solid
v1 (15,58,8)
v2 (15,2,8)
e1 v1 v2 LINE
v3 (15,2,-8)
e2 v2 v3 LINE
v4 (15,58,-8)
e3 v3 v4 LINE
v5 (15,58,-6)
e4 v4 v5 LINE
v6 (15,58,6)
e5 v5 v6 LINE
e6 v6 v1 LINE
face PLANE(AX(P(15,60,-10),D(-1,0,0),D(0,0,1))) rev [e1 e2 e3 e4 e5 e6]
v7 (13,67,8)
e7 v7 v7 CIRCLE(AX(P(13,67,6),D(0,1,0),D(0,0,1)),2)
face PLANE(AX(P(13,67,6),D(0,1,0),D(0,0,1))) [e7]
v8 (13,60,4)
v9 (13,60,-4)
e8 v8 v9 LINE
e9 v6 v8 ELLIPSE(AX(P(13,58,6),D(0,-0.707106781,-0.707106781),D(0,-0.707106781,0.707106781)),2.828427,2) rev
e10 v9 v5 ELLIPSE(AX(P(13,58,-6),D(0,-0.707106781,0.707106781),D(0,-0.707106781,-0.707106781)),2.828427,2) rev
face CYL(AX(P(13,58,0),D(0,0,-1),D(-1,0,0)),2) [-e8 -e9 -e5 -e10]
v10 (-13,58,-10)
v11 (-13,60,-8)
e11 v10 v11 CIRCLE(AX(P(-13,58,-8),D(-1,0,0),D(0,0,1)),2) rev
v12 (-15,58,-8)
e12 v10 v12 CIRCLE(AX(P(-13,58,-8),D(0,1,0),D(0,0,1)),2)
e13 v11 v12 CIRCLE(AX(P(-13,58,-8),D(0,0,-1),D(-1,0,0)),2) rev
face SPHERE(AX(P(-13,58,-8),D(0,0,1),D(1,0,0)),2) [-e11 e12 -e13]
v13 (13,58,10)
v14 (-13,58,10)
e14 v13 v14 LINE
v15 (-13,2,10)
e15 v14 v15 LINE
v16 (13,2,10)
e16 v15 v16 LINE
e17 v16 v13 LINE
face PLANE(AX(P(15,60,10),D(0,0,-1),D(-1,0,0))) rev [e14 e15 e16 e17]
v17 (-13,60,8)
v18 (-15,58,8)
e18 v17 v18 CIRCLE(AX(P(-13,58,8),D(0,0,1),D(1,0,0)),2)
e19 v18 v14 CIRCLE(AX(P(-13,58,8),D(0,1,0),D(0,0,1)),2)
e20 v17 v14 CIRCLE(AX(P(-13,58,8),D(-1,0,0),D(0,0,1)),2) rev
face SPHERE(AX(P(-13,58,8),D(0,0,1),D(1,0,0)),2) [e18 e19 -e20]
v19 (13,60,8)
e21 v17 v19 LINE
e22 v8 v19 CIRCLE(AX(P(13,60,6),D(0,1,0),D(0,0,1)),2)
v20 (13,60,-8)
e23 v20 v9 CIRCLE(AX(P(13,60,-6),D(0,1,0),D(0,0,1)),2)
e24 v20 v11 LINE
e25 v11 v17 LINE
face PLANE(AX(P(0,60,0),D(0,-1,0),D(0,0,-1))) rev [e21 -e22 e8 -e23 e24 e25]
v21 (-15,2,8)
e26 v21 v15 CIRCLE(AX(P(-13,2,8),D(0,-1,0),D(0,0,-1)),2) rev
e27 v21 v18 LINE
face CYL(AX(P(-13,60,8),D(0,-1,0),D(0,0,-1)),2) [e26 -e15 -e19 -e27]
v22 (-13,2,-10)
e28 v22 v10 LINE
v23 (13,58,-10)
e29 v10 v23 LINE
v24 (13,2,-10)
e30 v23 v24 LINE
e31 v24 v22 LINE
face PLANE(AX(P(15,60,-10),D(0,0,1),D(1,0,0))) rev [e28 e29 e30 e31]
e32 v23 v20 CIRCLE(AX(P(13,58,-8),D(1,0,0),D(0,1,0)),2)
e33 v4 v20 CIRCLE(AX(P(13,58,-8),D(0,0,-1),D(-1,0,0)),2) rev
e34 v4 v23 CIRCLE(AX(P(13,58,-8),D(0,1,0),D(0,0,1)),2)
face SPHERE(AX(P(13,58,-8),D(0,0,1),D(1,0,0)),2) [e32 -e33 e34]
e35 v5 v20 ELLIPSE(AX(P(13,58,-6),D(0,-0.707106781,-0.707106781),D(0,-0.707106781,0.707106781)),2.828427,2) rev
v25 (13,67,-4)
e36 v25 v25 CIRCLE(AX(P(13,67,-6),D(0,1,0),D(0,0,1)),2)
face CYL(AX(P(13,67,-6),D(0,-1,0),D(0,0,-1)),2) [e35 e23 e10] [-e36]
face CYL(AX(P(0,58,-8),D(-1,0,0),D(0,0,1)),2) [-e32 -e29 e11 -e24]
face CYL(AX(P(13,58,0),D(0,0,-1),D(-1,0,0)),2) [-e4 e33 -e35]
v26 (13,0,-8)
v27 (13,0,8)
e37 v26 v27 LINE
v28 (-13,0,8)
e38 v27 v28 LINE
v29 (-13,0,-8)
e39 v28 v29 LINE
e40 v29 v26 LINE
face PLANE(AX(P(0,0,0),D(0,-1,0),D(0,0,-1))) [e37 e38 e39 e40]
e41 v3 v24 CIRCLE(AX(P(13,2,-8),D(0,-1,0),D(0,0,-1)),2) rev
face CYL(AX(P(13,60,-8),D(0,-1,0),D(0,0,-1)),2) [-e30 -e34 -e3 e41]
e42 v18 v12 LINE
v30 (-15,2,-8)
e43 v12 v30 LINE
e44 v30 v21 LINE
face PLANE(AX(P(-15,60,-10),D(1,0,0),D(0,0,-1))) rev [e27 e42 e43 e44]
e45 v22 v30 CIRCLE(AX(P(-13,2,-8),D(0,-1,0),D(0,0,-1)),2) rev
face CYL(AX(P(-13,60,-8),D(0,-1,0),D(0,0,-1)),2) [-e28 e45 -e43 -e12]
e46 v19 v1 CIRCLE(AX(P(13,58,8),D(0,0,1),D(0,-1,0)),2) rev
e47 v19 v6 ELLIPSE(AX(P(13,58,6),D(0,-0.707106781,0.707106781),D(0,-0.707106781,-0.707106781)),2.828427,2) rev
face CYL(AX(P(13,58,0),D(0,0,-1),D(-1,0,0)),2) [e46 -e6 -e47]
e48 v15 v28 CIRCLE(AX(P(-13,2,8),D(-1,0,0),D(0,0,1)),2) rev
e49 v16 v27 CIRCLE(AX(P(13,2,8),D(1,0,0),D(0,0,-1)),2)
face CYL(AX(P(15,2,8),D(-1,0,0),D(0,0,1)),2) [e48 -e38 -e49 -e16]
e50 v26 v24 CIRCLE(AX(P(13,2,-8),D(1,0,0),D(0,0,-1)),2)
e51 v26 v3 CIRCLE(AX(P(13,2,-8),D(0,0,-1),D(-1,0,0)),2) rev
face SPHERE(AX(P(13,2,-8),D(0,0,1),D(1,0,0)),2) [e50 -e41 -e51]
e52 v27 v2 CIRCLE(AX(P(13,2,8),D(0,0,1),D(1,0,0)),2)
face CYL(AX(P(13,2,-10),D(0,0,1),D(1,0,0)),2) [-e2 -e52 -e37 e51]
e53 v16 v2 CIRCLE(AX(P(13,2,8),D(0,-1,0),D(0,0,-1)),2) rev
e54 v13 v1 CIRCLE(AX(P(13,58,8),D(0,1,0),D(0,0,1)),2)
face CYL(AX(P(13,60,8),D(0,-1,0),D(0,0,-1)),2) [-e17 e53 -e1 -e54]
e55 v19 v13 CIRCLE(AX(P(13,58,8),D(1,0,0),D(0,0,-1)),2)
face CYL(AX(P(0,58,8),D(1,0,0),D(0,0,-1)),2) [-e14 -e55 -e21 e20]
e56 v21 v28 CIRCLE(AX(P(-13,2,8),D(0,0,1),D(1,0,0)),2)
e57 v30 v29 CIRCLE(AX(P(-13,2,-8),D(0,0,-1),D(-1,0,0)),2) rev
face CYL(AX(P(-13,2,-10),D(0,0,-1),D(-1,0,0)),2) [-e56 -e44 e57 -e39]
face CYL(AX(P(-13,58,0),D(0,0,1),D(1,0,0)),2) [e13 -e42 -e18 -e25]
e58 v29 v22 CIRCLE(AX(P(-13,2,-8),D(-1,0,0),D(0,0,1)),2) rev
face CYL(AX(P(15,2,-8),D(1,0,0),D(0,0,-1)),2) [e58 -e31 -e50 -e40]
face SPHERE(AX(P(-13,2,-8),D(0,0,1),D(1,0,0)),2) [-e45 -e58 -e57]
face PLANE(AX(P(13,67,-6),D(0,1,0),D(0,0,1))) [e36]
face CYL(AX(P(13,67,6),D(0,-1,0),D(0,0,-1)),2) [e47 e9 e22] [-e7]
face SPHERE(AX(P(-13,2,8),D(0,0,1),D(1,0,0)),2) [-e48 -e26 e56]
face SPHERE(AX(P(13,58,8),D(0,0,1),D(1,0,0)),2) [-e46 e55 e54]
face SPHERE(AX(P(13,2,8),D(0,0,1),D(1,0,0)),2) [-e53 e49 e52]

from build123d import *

# Parameters (mm, degrees)
SKETCH1_W           = 30
SKETCH1_H           = 20
BOSS_EXTRUDE1_DEPTH = 60
SKETCH2_R           = 2
BOSS_EXTRUDE2_DEPTH = 7
FILLET1_R           = 2


with BuildPart() as part:
    # Sketch1 → Boss-Extrude1 (new body)
    with BuildSketch(Plane(origin=(0, 0, 0), x_dir=(1, 0, 0), z_dir=(0, 1, 0))):
        Rectangle(SKETCH1_W, SKETCH1_H)
    extrude(amount=BOSS_EXTRUDE1_DEPTH)

    # Sketch2 → Boss-Extrude2 (add)
    with BuildSketch(Plane(origin=(0, 60, 0), x_dir=(1, 0, 0), z_dir=(0, 1, 0))):
        with Locations((13, 6)):
            Circle(SKETCH2_R)
        with Locations((13, -6)):
            Circle(SKETCH2_R)
    extrude(amount=BOSS_EXTRUDE2_DEPTH)

    # Fillet1
    # the kernel refuses this fillet: 2 mm, written as the material it takes off along each edge
    with BuildSketch(Plane(origin=(13, 58, 8), x_dir=(0, 1, 0), z_dir=(1, 0, 0))) as fillet1_piece_1_section:
        Polygon((0, 0), (FILLET1_R * 1.02, 0), (FILLET1_R * 1.02, FILLET1_R * 1.02), (0, FILLET1_R * 1.02), align=None)
    fillet1_piece_1 = extrude(amount=FILLET1_R * 1.02, mode=Mode.PRIVATE)
    fillet1_piece_1 = fillet1_piece_1 - Plane(origin=(13, 58, 8), x_dir=(0, -0.7071067811865475, -0.7071067811865475), z_dir=(1, 0, 0)) * Sphere(FILLET1_R, mode=Mode.PRIVATE)
    add(fillet1_piece_1, mode=Mode.SUBTRACT)
    with BuildSketch(Plane(origin=(13, 58, -8), x_dir=(1, 0, 0), z_dir=(0, 0, -1))) as fillet1_piece_2_section:
        Polygon((0, 0), (FILLET1_R * 1.02, 0), (FILLET1_R * 1.02, -FILLET1_R * 1.02), (0, -FILLET1_R * 1.02), align=None)
    fillet1_piece_2 = extrude(amount=FILLET1_R * 1.02, mode=Mode.PRIVATE)
    fillet1_piece_2 = fillet1_piece_2 - Plane(origin=(13, 58, -8), x_dir=(-0.7071067811865475, -0.7071067811865475, 0), z_dir=(0, 0, -1)) * Sphere(FILLET1_R, mode=Mode.PRIVATE)
    add(fillet1_piece_2, mode=Mode.SUBTRACT)
    with BuildSketch(Plane(origin=(-13, 58, -8), x_dir=(-1, 0, 0), z_dir=(0, 0, -1))) as fillet1_piece_3_section:
        Polygon((0, 0), (FILLET1_R * 1.02, 0), (FILLET1_R * 1.02, FILLET1_R * 1.02), (0, FILLET1_R * 1.02), align=None)
    fillet1_piece_3 = extrude(amount=FILLET1_R * 1.02, mode=Mode.PRIVATE)
    fillet1_piece_3 = fillet1_piece_3 - Plane(origin=(-13, 58, -8), x_dir=(0.7071067811865475, -0.7071067811865475, 0), z_dir=(0, 0, -1)) * Sphere(FILLET1_R, mode=Mode.PRIVATE)
    add(fillet1_piece_3, mode=Mode.SUBTRACT)
    with BuildSketch(Plane(origin=(-13, 58, 8), x_dir=(0, 1, 0), z_dir=(-1, 0, 0))) as fillet1_piece_4_section:
        Polygon((0, 0), (FILLET1_R * 1.02, 0), (FILLET1_R * 1.02, -FILLET1_R * 1.02), (0, -FILLET1_R * 1.02), align=None)
    fillet1_piece_4 = extrude(amount=FILLET1_R * 1.02, mode=Mode.PRIVATE)
    fillet1_piece_4 = fillet1_piece_4 - Plane(origin=(-13, 58, 8), x_dir=(0, -0.7071067811865475, -0.7071067811865475), z_dir=(-1, 0, 0)) * Sphere(FILLET1_R, mode=Mode.PRIVATE)
    add(fillet1_piece_4, mode=Mode.SUBTRACT)
    with BuildSketch(Plane(origin=(13, 2, -8), x_dir=(1, 0, 0), z_dir=(0, 0, -1))) as fillet1_piece_5_section:
        Polygon((0, 0), (FILLET1_R * 1.02, 0), (FILLET1_R * 1.02, FILLET1_R * 1.02), (0, FILLET1_R * 1.02), align=None)
    fillet1_piece_5 = extrude(amount=FILLET1_R * 1.02, mode=Mode.PRIVATE)
    fillet1_piece_5 = fillet1_piece_5 - Plane(origin=(13, 2, -8), x_dir=(-0.7071067811865475, 0.7071067811865475, 0), z_dir=(0, 0, -1)) * Sphere(FILLET1_R, mode=Mode.PRIVATE)
    add(fillet1_piece_5, mode=Mode.SUBTRACT)
    with BuildSketch(Plane(origin=(-13, 2, -8), x_dir=(-1, 0, 0), z_dir=(0, 0, -1))) as fillet1_piece_6_section:
        Polygon((0, 0), (FILLET1_R * 1.02, 0), (FILLET1_R * 1.02, -FILLET1_R * 1.02), (0, -FILLET1_R * 1.02), align=None)
    fillet1_piece_6 = extrude(amount=FILLET1_R * 1.02, mode=Mode.PRIVATE)
    fillet1_piece_6 = fillet1_piece_6 - Plane(origin=(-13, 2, -8), x_dir=(0.7071067811865475, 0.7071067811865475, 0), z_dir=(0, 0, -1)) * Sphere(FILLET1_R, mode=Mode.PRIVATE)
    add(fillet1_piece_6, mode=Mode.SUBTRACT)
    with BuildSketch(Plane(origin=(13, 2, 8), x_dir=(0, -1, 0), z_dir=(1, 0, 0))) as fillet1_piece_7_section:
        Polygon((0, 0), (FILLET1_R * 1.02, 0), (FILLET1_R * 1.02, -FILLET1_R * 1.02), (0, -FILLET1_R * 1.02), align=None)
    fillet1_piece_7 = extrude(amount=FILLET1_R * 1.02, mode=Mode.PRIVATE)
    fillet1_piece_7 = fillet1_piece_7 - Plane(origin=(13, 2, 8), x_dir=(0, 0.7071067811865475, -0.7071067811865475), z_dir=(1, 0, 0)) * Sphere(FILLET1_R, mode=Mode.PRIVATE)
    add(fillet1_piece_7, mode=Mode.SUBTRACT)
    with BuildSketch(Plane(origin=(-13, 2, 8), x_dir=(0, -1, 0), z_dir=(-1, 0, 0))) as fillet1_piece_8_section:
        Polygon((0, 0), (FILLET1_R * 1.02, 0), (FILLET1_R * 1.02, FILLET1_R * 1.02), (0, FILLET1_R * 1.02), align=None)
    fillet1_piece_8 = extrude(amount=FILLET1_R * 1.02, mode=Mode.PRIVATE)
    fillet1_piece_8 = fillet1_piece_8 - Plane(origin=(-13, 2, 8), x_dir=(0, 0.7071067811865475, -0.7071067811865475), z_dir=(-1, 0, 0)) * Sphere(FILLET1_R, mode=Mode.PRIVATE)
    add(fillet1_piece_8, mode=Mode.SUBTRACT)
    with BuildSketch(Plane(origin=(15, 60, 8), x_dir=(0, -1, 0), z_dir=(0, 0, -1))) as fillet1_piece_9_section:
        with BuildLine():
            CenterArc((FILLET1_R, FILLET1_R), FILLET1_R, 180, 90)
            Line((0, FILLET1_R), (0, 0))
            Line((0, 0), (FILLET1_R, 0))
        make_face()
    fillet1_piece_9 = extrude(amount=2, mode=Mode.PRIVATE)
    fillet1_piece_9 = fillet1_piece_9 - Plane(origin=(13, 59.42884434, 6), x_dir=(1, 0, 0), z_dir=(0, -1, 0)) * Cylinder(2, 12, mode=Mode.PRIVATE)
    add(fillet1_piece_9, mode=Mode.SUBTRACT)
    with BuildSketch(Plane(origin=(15, 60, -6), x_dir=(0, -1, 0), z_dir=(0, 0, -1))) as fillet1_piece_10_section:
        with BuildLine():
            CenterArc((FILLET1_R, FILLET1_R), FILLET1_R, 180, 90)
            Line((0, FILLET1_R), (0, 0))
            Line((0, 0), (FILLET1_R, 0))
        make_face()
    fillet1_piece_10 = extrude(amount=2, mode=Mode.PRIVATE)
    fillet1_piece_10 = fillet1_piece_10 - Plane(origin=(13, 59.42884434, -6), x_dir=(1, 0, 0), z_dir=(0, -1, 0)) * Cylinder(2, 13, mode=Mode.PRIVATE)
    add(fillet1_piece_10, mode=Mode.SUBTRACT)
    with BuildSketch(Plane(origin=(13, 60, -10), x_dir=(0, -1, 0), z_dir=(-1, 0, 0)), Plane(origin=(-13, 0, 10), x_dir=(0, 0, -1), z_dir=(1, 0, 0))) as fillet1_piece_11:
        with BuildLine():
            CenterArc((FILLET1_R, FILLET1_R), FILLET1_R, 180, 90)
            Line((0, FILLET1_R), (0, 0))
            Line((0, 0), (FILLET1_R, 0))
        make_face()
    extrude(amount=26, mode=Mode.SUBTRACT)
    with BuildSketch(Plane(origin=(15, 60, 6), x_dir=(0, -1, 0), z_dir=(0, 0, -1))) as fillet1_piece_12_section:
        with BuildLine():
            CenterArc((FILLET1_R, FILLET1_R), FILLET1_R, 180, 90)
            Line((0, FILLET1_R), (0, 0))
            Line((0, 0), (FILLET1_R, 0))
        make_face()
    fillet1_piece_12 = extrude(amount=12, mode=Mode.PRIVATE)
    fillet1_piece_12 = fillet1_piece_12 - Plane(origin=(13, 59.530547013, 6), x_dir=(1, 0, 0), z_dir=(0, -1, 0)) * Cylinder(2, 32, mode=Mode.PRIVATE)
    fillet1_piece_12 = fillet1_piece_12 - Plane(origin=(13, 59.530547013, -6), x_dir=(1, 0, 0), z_dir=(0, -1, 0)) * Cylinder(2, 32, mode=Mode.PRIVATE)
    add(fillet1_piece_12, mode=Mode.SUBTRACT)
    with BuildSketch(Plane(origin=(-15, 60, -8), x_dir=(0, -1, 0), z_dir=(0, 0, 1))) as fillet1_piece_13:
        with BuildLine():
            CenterArc((FILLET1_R, FILLET1_R), FILLET1_R, 180, 90)
            Line((0, FILLET1_R), (0, 0))
            Line((0, 0), (FILLET1_R, 0))
        make_face()
    extrude(amount=16, mode=Mode.SUBTRACT)
    with BuildSketch(Plane(origin=(13, 0, -10), x_dir=(0, 1, 0), z_dir=(-1, 0, 0)), Plane(origin=(-13, 60, 10), x_dir=(0, 0, -1), z_dir=(1, 0, 0))) as fillet1_piece_14:
        with BuildLine():
            CenterArc((FILLET1_R, -FILLET1_R), FILLET1_R, 90, 90)
            Line((0, -FILLET1_R), (0, 0))
            Line((0, 0), (FILLET1_R, 0))
        make_face()
    extrude(amount=26, mode=Mode.SUBTRACT)
    with BuildSketch(Plane(origin=(15, 0, 8), x_dir=(0, 1, 0), z_dir=(0, 0, -1)), Plane(origin=(-15, 0, -8), x_dir=(0, 1, 0), z_dir=(0, 0, 1))) as fillet1_piece_15:
        with BuildLine():
            CenterArc((FILLET1_R, -FILLET1_R), FILLET1_R, 90, 90)
            Line((0, -FILLET1_R), (0, 0))
            Line((0, 0), (FILLET1_R, 0))
        make_face()
    extrude(amount=16, mode=Mode.SUBTRACT)
    with BuildSketch(Plane(origin=(-15, 2, -10), x_dir=(1, 0, 0), z_dir=(0, 1, 0)), Plane(origin=(-15, 2, 10), x_dir=(0, 0, -1), z_dir=(0, 1, 0))) as fillet1_piece_16:
        with BuildLine():
            CenterArc((FILLET1_R, -FILLET1_R), FILLET1_R, 90, 90)
            Line((0, -FILLET1_R), (0, 0))
            Line((0, 0), (FILLET1_R, 0))
        make_face()
    extrude(amount=56, mode=Mode.SUBTRACT)
    with BuildSketch(Plane(origin=(15, 2, -10), x_dir=(-1, 0, 0), z_dir=(0, 1, 0)), Plane(origin=(15, 2, 10), x_dir=(0, 0, -1), z_dir=(0, 1, 0))) as fillet1_piece_17:
        with BuildLine():
            CenterArc((FILLET1_R, FILLET1_R), FILLET1_R, 180, 90)
            Line((0, FILLET1_R), (0, 0))
            Line((0, 0), (FILLET1_R, 0))
        make_face()
    extrude(amount=56, mode=Mode.SUBTRACT)


solid = part.part
